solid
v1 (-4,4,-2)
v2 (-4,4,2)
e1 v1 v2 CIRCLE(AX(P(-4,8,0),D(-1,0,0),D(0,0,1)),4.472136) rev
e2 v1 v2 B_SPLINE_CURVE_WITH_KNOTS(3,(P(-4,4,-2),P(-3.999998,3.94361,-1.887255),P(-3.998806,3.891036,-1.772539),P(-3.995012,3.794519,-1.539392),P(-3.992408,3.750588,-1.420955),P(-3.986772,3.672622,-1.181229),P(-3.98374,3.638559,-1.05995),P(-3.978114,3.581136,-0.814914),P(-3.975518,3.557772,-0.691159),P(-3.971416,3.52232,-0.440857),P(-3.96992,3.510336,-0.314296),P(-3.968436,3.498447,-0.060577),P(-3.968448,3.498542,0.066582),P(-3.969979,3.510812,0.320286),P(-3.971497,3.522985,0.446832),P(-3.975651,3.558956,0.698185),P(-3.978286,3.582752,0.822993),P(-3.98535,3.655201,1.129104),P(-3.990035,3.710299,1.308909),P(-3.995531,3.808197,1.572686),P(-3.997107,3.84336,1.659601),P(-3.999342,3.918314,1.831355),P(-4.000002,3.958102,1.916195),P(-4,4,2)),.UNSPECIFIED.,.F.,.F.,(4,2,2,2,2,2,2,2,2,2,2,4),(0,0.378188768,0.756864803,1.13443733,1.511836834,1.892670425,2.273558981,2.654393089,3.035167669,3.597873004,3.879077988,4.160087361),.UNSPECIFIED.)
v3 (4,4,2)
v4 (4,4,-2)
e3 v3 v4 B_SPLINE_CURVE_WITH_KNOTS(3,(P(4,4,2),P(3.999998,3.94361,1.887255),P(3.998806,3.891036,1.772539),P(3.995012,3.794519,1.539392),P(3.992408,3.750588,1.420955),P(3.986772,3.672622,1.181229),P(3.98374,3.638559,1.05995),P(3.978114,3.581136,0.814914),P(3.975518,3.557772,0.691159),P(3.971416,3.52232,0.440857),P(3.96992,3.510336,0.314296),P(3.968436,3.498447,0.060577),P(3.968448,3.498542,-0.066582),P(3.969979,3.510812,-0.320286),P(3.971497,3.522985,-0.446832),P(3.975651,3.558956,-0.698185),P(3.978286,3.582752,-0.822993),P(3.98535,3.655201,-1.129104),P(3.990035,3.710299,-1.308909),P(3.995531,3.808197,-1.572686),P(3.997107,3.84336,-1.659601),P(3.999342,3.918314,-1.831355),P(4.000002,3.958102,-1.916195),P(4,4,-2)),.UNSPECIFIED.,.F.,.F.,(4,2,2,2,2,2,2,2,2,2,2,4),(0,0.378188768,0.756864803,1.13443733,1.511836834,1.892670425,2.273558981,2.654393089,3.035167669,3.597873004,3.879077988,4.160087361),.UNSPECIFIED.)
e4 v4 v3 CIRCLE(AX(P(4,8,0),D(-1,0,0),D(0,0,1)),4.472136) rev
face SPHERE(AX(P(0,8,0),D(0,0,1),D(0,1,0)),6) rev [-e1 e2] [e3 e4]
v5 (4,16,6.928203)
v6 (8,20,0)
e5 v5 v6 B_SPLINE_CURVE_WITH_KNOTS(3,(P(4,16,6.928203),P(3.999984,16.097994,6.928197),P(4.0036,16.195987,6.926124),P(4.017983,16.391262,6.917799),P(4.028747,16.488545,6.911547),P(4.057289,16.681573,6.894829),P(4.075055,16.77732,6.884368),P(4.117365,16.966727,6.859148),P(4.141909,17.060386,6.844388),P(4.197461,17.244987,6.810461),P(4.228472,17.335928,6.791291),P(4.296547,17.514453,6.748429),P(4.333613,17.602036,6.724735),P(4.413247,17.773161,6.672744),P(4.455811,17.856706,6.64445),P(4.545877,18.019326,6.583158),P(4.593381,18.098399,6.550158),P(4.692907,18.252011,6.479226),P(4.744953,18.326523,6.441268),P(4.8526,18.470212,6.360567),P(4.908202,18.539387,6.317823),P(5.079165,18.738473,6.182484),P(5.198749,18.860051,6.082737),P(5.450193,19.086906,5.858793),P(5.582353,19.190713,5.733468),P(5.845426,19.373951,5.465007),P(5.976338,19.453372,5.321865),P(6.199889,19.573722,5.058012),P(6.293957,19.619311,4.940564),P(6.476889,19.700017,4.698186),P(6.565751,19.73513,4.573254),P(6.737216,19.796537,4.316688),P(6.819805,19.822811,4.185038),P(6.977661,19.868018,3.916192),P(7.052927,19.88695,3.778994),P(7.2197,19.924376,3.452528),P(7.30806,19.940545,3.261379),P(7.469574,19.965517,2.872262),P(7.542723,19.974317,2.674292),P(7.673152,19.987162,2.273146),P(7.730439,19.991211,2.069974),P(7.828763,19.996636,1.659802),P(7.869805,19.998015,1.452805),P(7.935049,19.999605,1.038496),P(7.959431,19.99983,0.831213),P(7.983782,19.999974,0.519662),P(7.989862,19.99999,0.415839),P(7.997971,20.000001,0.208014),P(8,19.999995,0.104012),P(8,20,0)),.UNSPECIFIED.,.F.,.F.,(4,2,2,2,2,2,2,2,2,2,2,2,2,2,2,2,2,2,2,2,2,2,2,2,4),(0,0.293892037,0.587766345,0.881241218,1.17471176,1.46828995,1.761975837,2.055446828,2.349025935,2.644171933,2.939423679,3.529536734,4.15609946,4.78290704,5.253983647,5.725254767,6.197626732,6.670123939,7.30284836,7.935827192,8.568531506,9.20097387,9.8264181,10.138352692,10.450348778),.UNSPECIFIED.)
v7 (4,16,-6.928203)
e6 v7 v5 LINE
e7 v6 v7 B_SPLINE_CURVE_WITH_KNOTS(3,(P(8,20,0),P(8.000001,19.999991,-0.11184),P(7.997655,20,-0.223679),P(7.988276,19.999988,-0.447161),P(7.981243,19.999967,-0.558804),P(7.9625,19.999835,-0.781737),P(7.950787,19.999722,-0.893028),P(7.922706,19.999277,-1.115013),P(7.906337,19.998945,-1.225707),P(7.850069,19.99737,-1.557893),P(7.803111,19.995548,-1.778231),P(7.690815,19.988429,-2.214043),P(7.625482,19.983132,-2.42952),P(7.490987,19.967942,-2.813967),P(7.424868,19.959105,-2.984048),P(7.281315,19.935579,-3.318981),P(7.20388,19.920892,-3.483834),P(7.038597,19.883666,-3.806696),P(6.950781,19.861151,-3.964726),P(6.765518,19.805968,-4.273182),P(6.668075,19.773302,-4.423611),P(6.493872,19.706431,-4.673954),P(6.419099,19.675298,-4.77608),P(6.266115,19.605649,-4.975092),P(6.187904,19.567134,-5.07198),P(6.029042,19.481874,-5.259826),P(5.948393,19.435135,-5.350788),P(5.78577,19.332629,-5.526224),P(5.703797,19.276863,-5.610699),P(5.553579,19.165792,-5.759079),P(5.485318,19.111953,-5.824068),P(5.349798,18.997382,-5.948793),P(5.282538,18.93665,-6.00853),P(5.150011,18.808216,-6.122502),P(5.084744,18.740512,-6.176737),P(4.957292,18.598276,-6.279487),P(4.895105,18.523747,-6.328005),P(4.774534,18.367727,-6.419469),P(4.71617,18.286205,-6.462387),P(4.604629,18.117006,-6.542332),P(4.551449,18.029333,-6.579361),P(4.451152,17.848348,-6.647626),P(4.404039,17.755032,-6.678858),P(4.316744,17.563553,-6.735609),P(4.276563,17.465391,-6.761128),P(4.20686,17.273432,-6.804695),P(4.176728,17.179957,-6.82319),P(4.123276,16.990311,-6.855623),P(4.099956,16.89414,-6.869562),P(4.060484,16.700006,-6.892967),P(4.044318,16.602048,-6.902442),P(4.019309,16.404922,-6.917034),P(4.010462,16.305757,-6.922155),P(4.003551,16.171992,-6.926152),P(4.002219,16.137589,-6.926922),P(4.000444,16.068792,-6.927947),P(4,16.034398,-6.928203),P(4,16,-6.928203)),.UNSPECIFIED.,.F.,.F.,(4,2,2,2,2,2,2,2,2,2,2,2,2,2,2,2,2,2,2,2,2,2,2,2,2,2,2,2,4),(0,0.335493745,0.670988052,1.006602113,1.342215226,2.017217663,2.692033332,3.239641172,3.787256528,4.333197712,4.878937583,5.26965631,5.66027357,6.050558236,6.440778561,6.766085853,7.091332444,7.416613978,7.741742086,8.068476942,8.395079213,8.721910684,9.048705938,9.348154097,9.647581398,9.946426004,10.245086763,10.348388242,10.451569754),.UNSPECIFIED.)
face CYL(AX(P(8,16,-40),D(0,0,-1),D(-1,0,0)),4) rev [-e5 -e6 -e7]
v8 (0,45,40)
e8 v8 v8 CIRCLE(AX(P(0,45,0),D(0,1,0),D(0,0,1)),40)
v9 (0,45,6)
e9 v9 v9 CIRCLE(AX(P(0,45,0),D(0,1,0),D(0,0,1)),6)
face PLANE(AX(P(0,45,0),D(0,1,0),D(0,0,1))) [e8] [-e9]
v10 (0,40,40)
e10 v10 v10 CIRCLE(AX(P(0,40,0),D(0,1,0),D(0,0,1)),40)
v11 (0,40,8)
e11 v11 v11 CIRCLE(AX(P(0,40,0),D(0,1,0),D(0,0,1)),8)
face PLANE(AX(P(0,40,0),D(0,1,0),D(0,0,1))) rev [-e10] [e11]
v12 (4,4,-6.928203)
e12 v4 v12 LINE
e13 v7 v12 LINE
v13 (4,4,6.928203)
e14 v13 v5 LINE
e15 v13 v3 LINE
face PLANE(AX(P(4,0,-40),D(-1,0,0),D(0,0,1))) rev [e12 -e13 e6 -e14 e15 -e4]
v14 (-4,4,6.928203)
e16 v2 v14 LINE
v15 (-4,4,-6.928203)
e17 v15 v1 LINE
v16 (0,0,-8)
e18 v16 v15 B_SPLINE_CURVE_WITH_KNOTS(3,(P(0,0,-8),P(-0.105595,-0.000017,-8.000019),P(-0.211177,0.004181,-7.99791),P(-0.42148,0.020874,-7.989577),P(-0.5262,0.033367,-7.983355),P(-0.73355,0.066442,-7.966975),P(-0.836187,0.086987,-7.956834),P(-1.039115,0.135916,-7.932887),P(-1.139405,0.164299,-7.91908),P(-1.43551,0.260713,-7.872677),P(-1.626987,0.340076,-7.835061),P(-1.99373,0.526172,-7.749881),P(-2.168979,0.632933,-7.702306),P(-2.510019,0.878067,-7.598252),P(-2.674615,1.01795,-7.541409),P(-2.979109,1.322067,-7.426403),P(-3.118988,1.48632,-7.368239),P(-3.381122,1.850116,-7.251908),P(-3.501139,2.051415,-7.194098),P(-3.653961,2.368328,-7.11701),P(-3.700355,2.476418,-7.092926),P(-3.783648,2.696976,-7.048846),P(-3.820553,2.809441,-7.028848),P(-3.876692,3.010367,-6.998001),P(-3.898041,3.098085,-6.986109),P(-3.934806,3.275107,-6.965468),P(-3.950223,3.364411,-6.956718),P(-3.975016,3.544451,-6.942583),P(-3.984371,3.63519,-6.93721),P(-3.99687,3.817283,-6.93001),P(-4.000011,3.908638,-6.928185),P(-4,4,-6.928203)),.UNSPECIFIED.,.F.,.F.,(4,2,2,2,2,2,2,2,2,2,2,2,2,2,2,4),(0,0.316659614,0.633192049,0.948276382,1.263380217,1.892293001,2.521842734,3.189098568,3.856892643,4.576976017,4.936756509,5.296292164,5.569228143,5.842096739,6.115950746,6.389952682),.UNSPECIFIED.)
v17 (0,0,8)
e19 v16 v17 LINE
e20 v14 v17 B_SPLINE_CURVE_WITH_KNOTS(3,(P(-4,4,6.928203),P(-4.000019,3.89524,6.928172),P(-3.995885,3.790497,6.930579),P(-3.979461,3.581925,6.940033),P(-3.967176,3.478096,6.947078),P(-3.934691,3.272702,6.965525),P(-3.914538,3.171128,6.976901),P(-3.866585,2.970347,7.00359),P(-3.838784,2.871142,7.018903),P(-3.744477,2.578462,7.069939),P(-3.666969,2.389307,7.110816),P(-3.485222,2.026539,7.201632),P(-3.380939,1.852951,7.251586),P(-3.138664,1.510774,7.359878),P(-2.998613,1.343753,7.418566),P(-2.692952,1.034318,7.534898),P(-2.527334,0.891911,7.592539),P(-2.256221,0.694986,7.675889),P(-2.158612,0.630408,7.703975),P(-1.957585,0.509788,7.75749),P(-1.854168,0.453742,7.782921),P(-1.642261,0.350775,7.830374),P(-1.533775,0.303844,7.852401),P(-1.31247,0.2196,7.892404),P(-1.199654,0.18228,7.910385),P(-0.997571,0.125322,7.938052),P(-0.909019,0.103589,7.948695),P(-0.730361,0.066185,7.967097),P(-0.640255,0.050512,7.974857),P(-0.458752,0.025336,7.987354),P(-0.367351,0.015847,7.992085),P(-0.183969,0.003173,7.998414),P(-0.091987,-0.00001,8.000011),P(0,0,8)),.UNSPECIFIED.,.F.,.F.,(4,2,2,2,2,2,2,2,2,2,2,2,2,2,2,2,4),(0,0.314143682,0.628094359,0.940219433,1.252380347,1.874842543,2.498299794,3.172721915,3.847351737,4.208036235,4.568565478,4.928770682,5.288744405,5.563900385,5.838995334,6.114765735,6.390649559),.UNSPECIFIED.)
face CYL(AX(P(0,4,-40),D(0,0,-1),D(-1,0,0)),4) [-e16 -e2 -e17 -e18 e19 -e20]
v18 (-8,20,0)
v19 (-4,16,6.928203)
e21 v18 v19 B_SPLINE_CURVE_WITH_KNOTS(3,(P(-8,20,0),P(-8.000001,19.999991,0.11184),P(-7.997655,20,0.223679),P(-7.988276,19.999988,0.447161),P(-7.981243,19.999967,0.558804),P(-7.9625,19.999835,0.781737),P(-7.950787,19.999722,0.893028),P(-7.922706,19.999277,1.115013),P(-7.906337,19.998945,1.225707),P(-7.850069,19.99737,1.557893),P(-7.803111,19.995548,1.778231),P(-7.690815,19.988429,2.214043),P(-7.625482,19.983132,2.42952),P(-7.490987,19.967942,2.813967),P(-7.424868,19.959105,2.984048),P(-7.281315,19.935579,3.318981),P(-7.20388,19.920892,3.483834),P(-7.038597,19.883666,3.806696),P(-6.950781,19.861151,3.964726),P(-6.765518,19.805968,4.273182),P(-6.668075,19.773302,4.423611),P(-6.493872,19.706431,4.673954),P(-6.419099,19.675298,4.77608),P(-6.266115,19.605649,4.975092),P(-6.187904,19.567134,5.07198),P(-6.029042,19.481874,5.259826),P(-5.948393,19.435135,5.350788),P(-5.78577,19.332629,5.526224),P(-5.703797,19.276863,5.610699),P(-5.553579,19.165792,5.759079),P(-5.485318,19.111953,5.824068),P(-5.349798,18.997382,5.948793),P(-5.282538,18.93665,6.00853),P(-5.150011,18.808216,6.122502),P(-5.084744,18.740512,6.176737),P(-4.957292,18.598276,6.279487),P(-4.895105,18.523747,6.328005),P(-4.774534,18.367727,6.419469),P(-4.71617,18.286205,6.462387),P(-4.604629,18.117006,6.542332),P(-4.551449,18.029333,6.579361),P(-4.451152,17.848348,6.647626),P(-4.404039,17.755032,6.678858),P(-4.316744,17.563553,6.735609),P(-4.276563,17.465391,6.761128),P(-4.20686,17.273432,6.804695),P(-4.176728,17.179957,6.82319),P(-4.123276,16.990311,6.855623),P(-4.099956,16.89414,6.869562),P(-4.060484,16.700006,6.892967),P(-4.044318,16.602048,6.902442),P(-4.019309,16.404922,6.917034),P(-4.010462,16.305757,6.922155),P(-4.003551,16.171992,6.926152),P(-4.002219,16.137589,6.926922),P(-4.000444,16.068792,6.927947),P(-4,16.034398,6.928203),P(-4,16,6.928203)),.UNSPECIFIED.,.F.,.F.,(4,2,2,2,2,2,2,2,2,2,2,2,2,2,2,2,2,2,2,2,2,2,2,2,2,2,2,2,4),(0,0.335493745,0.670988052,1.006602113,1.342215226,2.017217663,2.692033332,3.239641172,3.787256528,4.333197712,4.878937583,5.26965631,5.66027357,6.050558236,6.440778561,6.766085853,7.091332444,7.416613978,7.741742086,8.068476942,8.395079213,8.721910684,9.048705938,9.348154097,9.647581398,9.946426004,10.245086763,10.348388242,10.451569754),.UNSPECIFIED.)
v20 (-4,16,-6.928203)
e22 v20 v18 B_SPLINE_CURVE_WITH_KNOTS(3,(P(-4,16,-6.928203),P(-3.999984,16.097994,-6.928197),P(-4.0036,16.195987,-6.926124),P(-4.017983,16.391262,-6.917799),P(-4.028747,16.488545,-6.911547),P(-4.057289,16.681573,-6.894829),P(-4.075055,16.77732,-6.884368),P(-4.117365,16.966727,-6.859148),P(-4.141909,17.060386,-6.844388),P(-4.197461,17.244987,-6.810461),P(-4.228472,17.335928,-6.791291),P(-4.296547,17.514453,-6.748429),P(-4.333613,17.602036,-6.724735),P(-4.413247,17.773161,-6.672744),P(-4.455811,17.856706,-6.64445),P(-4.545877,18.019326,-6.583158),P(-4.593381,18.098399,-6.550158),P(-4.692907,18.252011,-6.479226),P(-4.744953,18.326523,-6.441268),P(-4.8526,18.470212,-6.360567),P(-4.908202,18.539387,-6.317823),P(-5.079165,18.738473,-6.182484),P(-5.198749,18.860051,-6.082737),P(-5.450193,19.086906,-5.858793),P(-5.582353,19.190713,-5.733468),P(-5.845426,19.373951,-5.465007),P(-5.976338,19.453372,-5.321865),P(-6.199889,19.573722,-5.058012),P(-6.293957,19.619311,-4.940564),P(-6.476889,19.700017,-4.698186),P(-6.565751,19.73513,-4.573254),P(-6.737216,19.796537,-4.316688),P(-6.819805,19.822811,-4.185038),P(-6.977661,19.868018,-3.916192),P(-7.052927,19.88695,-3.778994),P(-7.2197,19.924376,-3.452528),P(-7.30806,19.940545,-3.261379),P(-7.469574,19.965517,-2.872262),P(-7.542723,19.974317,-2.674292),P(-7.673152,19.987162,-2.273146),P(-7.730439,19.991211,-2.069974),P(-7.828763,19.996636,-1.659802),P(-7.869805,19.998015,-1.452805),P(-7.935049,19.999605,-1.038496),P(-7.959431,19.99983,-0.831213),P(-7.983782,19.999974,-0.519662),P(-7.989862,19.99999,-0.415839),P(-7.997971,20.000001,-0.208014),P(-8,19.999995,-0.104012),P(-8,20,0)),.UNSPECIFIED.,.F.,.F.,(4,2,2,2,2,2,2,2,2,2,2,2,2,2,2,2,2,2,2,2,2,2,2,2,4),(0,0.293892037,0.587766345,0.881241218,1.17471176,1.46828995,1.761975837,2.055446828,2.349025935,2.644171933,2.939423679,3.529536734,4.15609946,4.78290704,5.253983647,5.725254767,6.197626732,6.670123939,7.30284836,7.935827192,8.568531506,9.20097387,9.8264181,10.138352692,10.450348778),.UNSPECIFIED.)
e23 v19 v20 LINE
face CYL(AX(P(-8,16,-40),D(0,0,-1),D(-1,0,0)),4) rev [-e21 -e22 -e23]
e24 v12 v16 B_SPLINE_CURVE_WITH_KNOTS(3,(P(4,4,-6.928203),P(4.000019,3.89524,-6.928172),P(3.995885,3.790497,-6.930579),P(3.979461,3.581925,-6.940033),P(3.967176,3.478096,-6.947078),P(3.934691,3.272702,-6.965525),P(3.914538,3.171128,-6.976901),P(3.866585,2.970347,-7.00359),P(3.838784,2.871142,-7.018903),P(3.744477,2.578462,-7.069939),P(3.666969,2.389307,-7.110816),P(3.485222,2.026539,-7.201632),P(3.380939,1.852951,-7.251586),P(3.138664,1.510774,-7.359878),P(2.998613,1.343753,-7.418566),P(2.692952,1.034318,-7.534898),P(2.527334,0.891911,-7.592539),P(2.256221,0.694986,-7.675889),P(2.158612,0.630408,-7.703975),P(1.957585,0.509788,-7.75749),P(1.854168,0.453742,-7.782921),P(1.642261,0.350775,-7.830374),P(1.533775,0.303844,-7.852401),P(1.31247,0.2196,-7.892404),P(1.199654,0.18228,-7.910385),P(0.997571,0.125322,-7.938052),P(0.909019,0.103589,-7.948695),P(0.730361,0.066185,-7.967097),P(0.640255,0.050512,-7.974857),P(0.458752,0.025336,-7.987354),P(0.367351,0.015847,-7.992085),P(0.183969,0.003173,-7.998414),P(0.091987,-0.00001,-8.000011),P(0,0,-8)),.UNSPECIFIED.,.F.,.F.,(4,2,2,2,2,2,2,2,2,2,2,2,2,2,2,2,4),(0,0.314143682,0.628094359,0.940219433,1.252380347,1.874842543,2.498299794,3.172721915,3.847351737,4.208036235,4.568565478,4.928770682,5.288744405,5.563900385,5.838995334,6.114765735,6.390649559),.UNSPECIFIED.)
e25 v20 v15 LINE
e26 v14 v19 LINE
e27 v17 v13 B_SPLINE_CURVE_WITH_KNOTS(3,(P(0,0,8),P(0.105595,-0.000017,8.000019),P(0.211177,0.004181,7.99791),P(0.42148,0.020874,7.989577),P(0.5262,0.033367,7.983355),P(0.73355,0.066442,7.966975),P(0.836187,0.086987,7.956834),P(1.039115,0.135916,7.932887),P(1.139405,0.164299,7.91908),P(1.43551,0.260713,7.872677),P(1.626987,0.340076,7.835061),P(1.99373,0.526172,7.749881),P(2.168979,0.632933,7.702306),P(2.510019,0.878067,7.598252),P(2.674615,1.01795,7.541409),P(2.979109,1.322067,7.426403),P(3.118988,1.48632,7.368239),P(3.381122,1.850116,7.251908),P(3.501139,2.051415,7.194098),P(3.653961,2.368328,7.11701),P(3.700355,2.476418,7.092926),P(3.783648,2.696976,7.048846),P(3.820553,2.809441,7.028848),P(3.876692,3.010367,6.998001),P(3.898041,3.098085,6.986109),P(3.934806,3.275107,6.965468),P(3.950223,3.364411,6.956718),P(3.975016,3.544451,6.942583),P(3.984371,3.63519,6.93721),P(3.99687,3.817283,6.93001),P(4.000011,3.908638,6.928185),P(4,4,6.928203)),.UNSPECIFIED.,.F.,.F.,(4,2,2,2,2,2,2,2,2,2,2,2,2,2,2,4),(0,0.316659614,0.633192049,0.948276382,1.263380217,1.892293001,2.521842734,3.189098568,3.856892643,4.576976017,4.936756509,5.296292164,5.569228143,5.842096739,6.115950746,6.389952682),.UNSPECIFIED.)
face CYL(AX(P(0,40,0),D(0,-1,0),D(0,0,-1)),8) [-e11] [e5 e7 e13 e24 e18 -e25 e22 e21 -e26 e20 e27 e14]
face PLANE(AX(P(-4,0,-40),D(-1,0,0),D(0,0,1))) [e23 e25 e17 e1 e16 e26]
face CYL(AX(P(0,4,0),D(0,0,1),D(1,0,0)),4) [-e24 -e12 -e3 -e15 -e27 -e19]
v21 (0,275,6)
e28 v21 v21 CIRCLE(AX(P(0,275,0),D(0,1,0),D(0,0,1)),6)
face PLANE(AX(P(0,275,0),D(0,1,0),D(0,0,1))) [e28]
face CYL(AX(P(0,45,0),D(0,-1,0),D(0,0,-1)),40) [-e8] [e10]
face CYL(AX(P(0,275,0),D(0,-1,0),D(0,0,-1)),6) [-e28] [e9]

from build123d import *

# Parameters (mm, degrees)
SCHIZZO1_R                   = 8
ESTRUSIONE_ESTRUSIONE1_DEPTH = 40
SCHIZZO2_R                   = 40
ESTRUSIONE_ESTRUSIONE2_DEPTH = 5
SCHIZZO3_R                   = 6
ESTRUSIONE_ESTRUSIONE3_DEPTH = 230
SCHIZZO4_W                   = 4
SCHIZZO4_H                   = 20
TAGLIO_ESTRUSIONE1_DEPTH     = 281.757902827
RACCORDO1_R                  = 4


with BuildPart() as part:
    # Schizzo1 → Estrusione-Estrusione1 (new body)
    with BuildSketch(Plane(origin=(0, 0, 0), x_dir=(1, 0, 0), z_dir=(0, 1, 0))):
        with Locations(Location((0, 0, 0), (0, 0, 270))):
            Circle(SCHIZZO1_R)
    extrude(amount=ESTRUSIONE_ESTRUSIONE1_DEPTH)

    # Schizzo2 → Estrusione-Estrusione2 (add)
    with BuildSketch(Plane(origin=(0, 40, 0), x_dir=(1, 0, 0), z_dir=(0, 1, 0))):
        with Locations(Location((0, 0, 0), (0, 0, 270))):
            Circle(SCHIZZO2_R)
    extrude(amount=ESTRUSIONE_ESTRUSIONE2_DEPTH)

    # Schizzo3 → Estrusione-Estrusione3 (add)
    with BuildSketch(Plane(origin=(0, 45, 0), x_dir=(1, 0, 0), z_dir=(0, 1, 0))):
        with Locations(Location((0, 0, 0), (0, 0, 270))):
            Circle(SCHIZZO3_R)
    extrude(amount=ESTRUSIONE_ESTRUSIONE3_DEPTH)

    # Schizzo4 → Taglio-Estrusione1 (cut, symmetric)
    with BuildSketch(Plane.XY):
        with Locations((6, 10)):
            Rectangle(SCHIZZO4_W, SCHIZZO4_H)
    taglio_estrusione1 = extrude(amount=TAGLIO_ESTRUSIONE1_DEPTH, both=True, mode=Mode.SUBTRACT)

    # Specchia1: Taglio-Estrusione1 across plane
    add(taglio_estrusione1.mirror(Plane(origin=(0, 0, 0), x_dir=(0, 0, 1), z_dir=(1, 0, 0))), mode=Mode.SUBTRACT)


with BuildPart() as body_2:
    # Schizzo5 → Rivoluzione1 (revolve)
    with BuildSketch(Plane(origin=(0, 0, 0), x_dir=(0, 0, -1), z_dir=(1, 0, 0))):
        with BuildLine():
            Line((-6, 8), (6, 8))
            ThreePointArc((6, 8), (0, 14), (-6, 8))
        make_face()
    revolve(axis=Axis((0, 8, 6), (0, 0, -1)))


with BuildPart() as part_1:
    add(part.part)

    # Abbina1: cut body 2
    add(body_2.part, mode=Mode.SUBTRACT)

    # Raccordo1
    # the kernel refuses this fillet: 4 mm, written as the material it adds along each edge
    with BuildSketch(Plane(origin=(4, 20, 16.92820323), x_dir=(0, -1, 0), z_dir=(0, 0, -1))) as raccordo1_piece_1_section:
        with BuildLine():
            CenterArc((RACCORDO1_R, -RACCORDO1_R), RACCORDO1_R, 90, 90)
            Line((0, -RACCORDO1_R), (0, 0))
            Line((0, 0), (RACCORDO1_R, 0))
        make_face()
    raccordo1_piece_1 = extrude(amount=33.856406461, mode=Mode.PRIVATE)
    raccordo1_piece_1 = raccordo1_piece_1 & Plane(origin=(0, 19.029808041, 0), x_dir=(0, 0, 1), z_dir=(0, -1, 0)) * Cylinder(8, 84, mode=Mode.PRIVATE)
    add(raccordo1_piece_1)
    with BuildSketch(Plane(origin=(-4, 20, 16.92820323), x_dir=(0, -1, 0), z_dir=(0, 0, -1))) as raccordo1_piece_2_section:
        with BuildLine():
            CenterArc((RACCORDO1_R, RACCORDO1_R), RACCORDO1_R, 180, 90)
            Line((0, RACCORDO1_R), (0, 0))
            Line((0, 0), (RACCORDO1_R, 0))
        make_face()
    raccordo1_piece_2 = extrude(amount=33.856406461, mode=Mode.PRIVATE)
    raccordo1_piece_2 = raccordo1_piece_2 & Plane(origin=(0, 19.029808041, 0), x_dir=(0, 0, 1), z_dir=(0, -1, 0)) * Cylinder(8, 84, mode=Mode.PRIVATE)
    add(raccordo1_piece_2)
    # the kernel refuses this fillet: 4 mm, written as the material it takes off along each edge
    with BuildSketch(Plane(origin=(-4, 0, 16.92820323), x_dir=(1, 0, 0), z_dir=(0, 0, -1))) as raccordo1_2_piece_1:
        with BuildLine():
            CenterArc((RACCORDO1_R, -RACCORDO1_R), RACCORDO1_R, 90, 90)
            Line((0, -RACCORDO1_R), (0, 0))
            Line((0, 0), (RACCORDO1_R, 0))
        make_face()
    extrude(amount=33.856406461, mode=Mode.SUBTRACT)
    with BuildSketch(Plane(origin=(4, 0, 16.92820323), x_dir=(-1, 0, 0), z_dir=(0, 0, -1))) as raccordo1_2_piece_2:
        with BuildLine():
            CenterArc((RACCORDO1_R, RACCORDO1_R), RACCORDO1_R, 180, 90)
            Line((0, RACCORDO1_R), (0, 0))
            Line((0, 0), (RACCORDO1_R, 0))
        make_face()
    extrude(amount=33.856406461, mode=Mode.SUBTRACT)


solid = part_1.part
